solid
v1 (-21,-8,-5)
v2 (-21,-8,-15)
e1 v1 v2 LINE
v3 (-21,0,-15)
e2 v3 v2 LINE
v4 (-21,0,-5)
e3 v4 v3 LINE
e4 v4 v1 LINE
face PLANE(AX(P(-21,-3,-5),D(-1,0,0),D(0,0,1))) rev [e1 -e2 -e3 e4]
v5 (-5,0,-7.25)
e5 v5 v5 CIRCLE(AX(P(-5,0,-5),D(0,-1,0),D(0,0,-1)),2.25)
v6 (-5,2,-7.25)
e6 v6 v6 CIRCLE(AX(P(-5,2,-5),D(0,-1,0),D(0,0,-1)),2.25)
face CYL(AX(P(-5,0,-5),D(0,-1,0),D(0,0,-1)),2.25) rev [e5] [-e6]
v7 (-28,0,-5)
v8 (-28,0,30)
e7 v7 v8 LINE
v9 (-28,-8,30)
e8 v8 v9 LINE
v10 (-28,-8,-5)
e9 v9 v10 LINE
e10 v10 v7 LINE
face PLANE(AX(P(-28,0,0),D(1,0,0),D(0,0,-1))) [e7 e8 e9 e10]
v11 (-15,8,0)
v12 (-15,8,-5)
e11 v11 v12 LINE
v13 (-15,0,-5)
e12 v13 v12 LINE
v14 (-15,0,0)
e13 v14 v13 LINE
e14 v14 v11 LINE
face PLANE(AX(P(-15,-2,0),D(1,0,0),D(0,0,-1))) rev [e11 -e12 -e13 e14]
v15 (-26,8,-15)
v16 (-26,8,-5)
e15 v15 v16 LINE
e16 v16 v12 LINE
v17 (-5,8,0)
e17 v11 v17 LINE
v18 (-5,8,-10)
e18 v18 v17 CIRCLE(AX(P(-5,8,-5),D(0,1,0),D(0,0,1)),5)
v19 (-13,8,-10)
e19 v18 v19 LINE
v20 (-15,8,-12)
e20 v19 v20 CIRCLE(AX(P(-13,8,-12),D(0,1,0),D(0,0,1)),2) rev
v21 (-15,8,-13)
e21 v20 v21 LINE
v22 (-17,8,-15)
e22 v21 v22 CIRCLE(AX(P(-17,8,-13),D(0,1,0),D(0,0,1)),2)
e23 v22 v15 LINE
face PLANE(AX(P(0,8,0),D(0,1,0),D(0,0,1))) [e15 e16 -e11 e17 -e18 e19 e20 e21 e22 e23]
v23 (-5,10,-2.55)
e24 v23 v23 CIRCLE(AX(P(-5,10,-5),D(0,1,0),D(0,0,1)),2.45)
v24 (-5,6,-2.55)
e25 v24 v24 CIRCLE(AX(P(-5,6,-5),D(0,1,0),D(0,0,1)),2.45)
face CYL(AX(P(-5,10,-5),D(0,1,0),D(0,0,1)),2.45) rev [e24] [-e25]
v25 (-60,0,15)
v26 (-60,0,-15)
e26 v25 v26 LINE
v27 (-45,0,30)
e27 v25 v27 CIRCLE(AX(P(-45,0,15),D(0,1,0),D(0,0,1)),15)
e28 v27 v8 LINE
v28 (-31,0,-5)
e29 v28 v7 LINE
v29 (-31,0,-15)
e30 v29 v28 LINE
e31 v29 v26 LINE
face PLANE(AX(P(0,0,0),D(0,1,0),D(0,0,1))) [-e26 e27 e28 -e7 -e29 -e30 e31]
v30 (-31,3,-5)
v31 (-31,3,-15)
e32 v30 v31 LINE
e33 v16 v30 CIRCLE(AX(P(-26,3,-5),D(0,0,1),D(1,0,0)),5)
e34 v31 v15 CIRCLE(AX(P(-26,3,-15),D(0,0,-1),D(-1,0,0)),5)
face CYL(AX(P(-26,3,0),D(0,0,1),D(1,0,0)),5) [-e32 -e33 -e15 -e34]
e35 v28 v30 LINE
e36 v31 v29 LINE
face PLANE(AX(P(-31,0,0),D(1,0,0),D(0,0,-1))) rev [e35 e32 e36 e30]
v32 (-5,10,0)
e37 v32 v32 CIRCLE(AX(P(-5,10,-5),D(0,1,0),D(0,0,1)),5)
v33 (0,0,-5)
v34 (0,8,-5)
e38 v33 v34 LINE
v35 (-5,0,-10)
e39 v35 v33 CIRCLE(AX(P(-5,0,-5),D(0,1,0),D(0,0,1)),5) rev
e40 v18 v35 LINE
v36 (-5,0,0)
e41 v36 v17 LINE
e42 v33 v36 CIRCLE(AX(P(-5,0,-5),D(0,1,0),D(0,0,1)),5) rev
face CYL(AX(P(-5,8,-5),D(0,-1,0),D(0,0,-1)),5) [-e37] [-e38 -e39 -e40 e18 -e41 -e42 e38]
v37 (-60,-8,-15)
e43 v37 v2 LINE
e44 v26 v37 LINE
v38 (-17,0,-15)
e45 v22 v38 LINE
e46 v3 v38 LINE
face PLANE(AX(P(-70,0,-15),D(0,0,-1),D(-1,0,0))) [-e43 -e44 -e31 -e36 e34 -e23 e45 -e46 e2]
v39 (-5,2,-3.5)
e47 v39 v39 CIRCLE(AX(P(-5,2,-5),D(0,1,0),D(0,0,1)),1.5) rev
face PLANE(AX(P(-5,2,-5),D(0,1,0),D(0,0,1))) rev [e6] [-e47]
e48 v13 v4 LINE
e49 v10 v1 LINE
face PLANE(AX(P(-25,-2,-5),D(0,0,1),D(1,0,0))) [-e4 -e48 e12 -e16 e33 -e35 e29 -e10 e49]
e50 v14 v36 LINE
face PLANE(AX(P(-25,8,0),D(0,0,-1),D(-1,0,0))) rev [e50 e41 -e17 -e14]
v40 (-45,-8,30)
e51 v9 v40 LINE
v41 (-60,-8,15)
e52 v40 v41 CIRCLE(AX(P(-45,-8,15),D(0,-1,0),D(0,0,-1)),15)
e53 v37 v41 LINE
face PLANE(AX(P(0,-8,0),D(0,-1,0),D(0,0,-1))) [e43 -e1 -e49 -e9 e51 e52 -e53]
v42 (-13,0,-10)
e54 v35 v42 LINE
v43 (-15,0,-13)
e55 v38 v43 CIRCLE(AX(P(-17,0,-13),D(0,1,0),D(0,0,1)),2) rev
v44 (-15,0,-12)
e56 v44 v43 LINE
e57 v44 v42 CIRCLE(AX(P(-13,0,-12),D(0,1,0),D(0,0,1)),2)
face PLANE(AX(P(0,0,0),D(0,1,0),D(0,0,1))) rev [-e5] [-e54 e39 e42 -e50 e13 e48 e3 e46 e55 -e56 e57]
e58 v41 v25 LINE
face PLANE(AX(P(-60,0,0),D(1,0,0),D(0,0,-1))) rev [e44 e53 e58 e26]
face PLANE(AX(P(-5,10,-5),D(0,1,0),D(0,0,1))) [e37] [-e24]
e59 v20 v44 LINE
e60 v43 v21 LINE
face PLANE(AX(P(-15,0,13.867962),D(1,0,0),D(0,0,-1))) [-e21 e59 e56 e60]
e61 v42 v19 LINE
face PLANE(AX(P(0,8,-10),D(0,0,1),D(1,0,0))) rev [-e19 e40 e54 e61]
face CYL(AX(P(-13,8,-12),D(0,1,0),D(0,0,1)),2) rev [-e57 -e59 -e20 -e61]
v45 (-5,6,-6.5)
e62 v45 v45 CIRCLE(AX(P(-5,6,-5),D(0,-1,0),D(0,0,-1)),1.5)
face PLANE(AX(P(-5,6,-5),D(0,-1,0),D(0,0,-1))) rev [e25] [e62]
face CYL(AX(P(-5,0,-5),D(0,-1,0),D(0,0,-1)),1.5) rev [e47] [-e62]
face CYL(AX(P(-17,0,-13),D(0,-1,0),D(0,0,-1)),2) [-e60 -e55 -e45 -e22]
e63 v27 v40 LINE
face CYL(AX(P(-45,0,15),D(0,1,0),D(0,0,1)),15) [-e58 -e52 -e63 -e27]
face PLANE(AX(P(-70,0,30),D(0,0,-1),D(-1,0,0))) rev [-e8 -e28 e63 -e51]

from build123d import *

# Parameters (mm, degrees)
EXTRUDE_1_DEPTH      = 8
FILLET_1_R           = 5
SKETCH_5_W           = 10
SKETCH_5_H           = 5
CUT_EXTRUDE_1_DEPTH  = 10
SKETCH_6_W           = 55
SKETCH_6_H           = 5
EXTRUDE_2_DEPTH      = 8
SKETCH_7_R           = 5
EXTRUDE_3_DEPTH      = 2
HOLE_WIZARD_1_D      = 4.9
HOLE_WIZARD_1_DEPTH  = 4
HOLE_WIZARD_2_D      = 3
HOLE_WIZARD_3_D      = 4.5
HOLE_WIZARD_3_DEPTH  = 2
SKETCH_16_W          = 45
SKETCH_16_H          = 10
CUT_EXTRUDE_4_DEPTH  = 82.018516402
SKETCH_17_W          = 45
SKETCH_17_H          = 45
EXTRUDE_4_DEPTH      = 16
SKETCH_20_W          = 45
SKETCH_20_H          = 45
CUT_EXTRUDE_5_DEPTH  = 8
SKETCH_21_W          = 10
SKETCH_21_H          = 16
EXTRUDE_6_DEPTH      = 10
SKETCH_23_W          = 55
SKETCH_23_H          = 45
CUT_EXTRUDE_6_DEPTH  = 8
SKETCH_24_W          = 35
SKETCH_24_H          = 8
CUT_EXTRUDE_7_DEPTH  = 3
FILLET_5_R           = 2
SKETCH_25_W          = 45
SKETCH_25_H          = 8
CUT_EXTRUDE_8_DEPTH  = 10
FILLET_6_R           = 15
SKETCH_27_W          = 6
SKETCH_27_H          = 10
CUT_EXTRUDE_10_DEPTH = 5
SKETCH_28_W          = 6
SKETCH_28_H          = 3
CUT_EXTRUDE_11_DEPTH = 76.663729752
SKETCH_29_W          = 10
SKETCH_29_H          = 8
EXTRUDE_7_DEPTH      = 6
FILLET_7_R           = 5


with BuildPart() as part:
    # 草图1 → 凸台-拉伸1 (new body)
    with BuildSketch(Plane(origin=(0, 0, 0), x_dir=(1, 0, 0), z_dir=(0, 1, 0))):
        Polygon((0, 0), (0, 10), (-70, 10), (-70, -40), (-25, -40), (-25, 0), align=None)
    extrude(amount=EXTRUDE_1_DEPTH)

    # 圆角1
    fillet_1_edges = [part.edges().sort_by_distance(p)[0] for p in [
        (0, 4, 0),
        (0, 4, -10),
    ]]
    fillet(fillet_1_edges, radius=FILLET_1_R - 0.0001)  # a hair under: the kernel refuses the full size

    # 草图5 → 切除-拉伸1 (cut)
    with BuildSketch(Plane(origin=(0, 8, 0), x_dir=(1, 0, 0), z_dir=(0, 1, 0))):
        with Locations((-20, 2.5)):
            Rectangle(SKETCH_5_W, SKETCH_5_H)
    extrude(amount=-CUT_EXTRUDE_1_DEPTH, mode=Mode.SUBTRACT)

    # 草图6 → 凸台-拉伸2 (add)
    with BuildSketch(Plane(origin=(0, 8, 0), x_dir=(1, 0, 0), z_dir=(0, 1, 0))):
        with Locations((-42.5, 12.5)):
            Rectangle(SKETCH_6_W, SKETCH_6_H)
    extrude(amount=-EXTRUDE_2_DEPTH)

    # 草图7 → 凸台-拉伸3 (add)
    with BuildSketch(Plane(origin=(0, 8, 0), x_dir=(1, 0, 0), z_dir=(0, 1, 0))):
        with Locations(Location((-5, 5, 0), (0, 0, 270))):
            Circle(SKETCH_7_R)
    extrude(amount=EXTRUDE_3_DEPTH)

    # 孔1
    with Locations(Plane(origin=(0, 10, 0), x_dir=(1, 0, 0), z_dir=(0, 1, 0))):
        with Locations((-5, 5)):
            Hole(HOLE_WIZARD_1_D / 2, depth=HOLE_WIZARD_1_DEPTH)

    # 孔2 (through all)
    with Locations(Plane(origin=(0, 0, 0), x_dir=(-1, 0, 0), z_dir=(0, -1, 0))):
        with Locations((5, 5)):
            Hole(HOLE_WIZARD_2_D / 2)

    # 孔3
    with Locations(Plane(origin=(0, 0, 0), x_dir=(-1, 0, 0), z_dir=(0, -1, 0))):
        with Locations((5, 5)):
            Hole(HOLE_WIZARD_3_D / 2, depth=HOLE_WIZARD_3_DEPTH)

    # 草图16 → 切除-拉伸4 (cut, through all)
    with BuildSketch(Plane(origin=(0, 8, 0), x_dir=(1, 0, 0), z_dir=(0, 1, 0))):
        with Locations((-47.5, -35)):
            Rectangle(SKETCH_16_W, SKETCH_16_H)
    extrude(amount=-CUT_EXTRUDE_4_DEPTH, mode=Mode.SUBTRACT)

    # 草图17 → 凸台-拉伸4 (add)
    with BuildSketch(Plane.XZ):
        with Locations((-47.5, 7.5)):
            Rectangle(SKETCH_17_W, SKETCH_17_H)
    extrude(amount=EXTRUDE_4_DEPTH)

    # 草图20 → 切除-拉伸5 (cut)
    with BuildSketch(Plane(origin=(0, 8, 0), x_dir=(1, 0, 0), z_dir=(0, 1, 0))):
        with Locations((-47.5, -7.5)):
            Rectangle(SKETCH_20_W, SKETCH_20_H)
    extrude(amount=-CUT_EXTRUDE_5_DEPTH, mode=Mode.SUBTRACT)


with BuildPart() as cut_extrude_5_piece_1:
    # of the separate pieces the step leaves, piece 1, a body of its own (cut_extrude_5_pieces)
    add(part.part.solids().sort_by_distance((-25, 0, 30))[0])



with BuildPart() as cut_extrude_5_piece_2:
    # of the separate pieces the step leaves, piece 2, a body of its own (cut_extrude_5_pieces)
    add(part.part.solids().sort_by_distance((0, 0, -4.9999))[0])


with BuildPart() as cut_extrude_5_piece_1_1:
    add(cut_extrude_5_piece_1.part)

    add(cut_extrude_5_piece_2.part)  # 凸台-拉伸6 merges 切除-拉伸5 piece 2
    # 草图21 → 凸台-拉伸6 (add)
    with BuildSketch(Plane(origin=(0, 0, -15), x_dir=(-1, 0, 0), z_dir=(0, 0, -1))):
        with Locations((20, -8)):
            Rectangle(SKETCH_21_W, SKETCH_21_H)
    extrude(amount=-EXTRUDE_6_DEPTH)

    # 草图23 → 切除-拉伸6 (cut)
    with BuildSketch(Plane.XZ.offset(16)):
        with Locations((-42.5, 7.5)):
            Rectangle(SKETCH_23_W, SKETCH_23_H)
    extrude(amount=-CUT_EXTRUDE_6_DEPTH, mode=Mode.SUBTRACT)

    # 草图24 → 切除-拉伸7 (cut)
    with BuildSketch(Plane(origin=(-25, 0, 0), x_dir=(0, 0, -1), z_dir=(1, 0, 0))):
        with Locations((-12.5, -4)):
            Rectangle(SKETCH_24_W, SKETCH_24_H)
    extrude(amount=-CUT_EXTRUDE_7_DEPTH, mode=Mode.SUBTRACT)

    # 圆角5
    fillet_5_edges = [cut_extrude_5_piece_1_1.edges().sort_by_distance(p)[0] for p in [
        (-15, 0, -15),
        (-15, 4, -10),
    ]]
    fillet(fillet_5_edges, radius=FILLET_5_R)

    # 草图25 → 切除-拉伸8 (cut)
    with BuildSketch(Plane.ZY.offset(70)):
        with Locations((7.5, -4)):
            Rectangle(SKETCH_25_W, SKETCH_25_H)
    extrude(amount=-CUT_EXTRUDE_8_DEPTH, mode=Mode.SUBTRACT)

    # 圆角6
    fillet_6_edges = [cut_extrude_5_piece_1_1.edges().sort_by_distance(p)[0] for p in [
        (-60, -4, 30),
    ]]
    fillet(fillet_6_edges, radius=FILLET_6_R)

    # 草图27 → 切除-拉伸10 (cut)
    with BuildSketch(Plane(origin=(0, -8, 0), x_dir=(-1, 0, 0), z_dir=(0, -1, 0))):
        with Locations((18, 10)):
            Rectangle(SKETCH_27_W, SKETCH_27_H)
    extrude(amount=-CUT_EXTRUDE_10_DEPTH, mode=Mode.SUBTRACT)

    # 草图28 → 切除-拉伸11 (cut, through all)
    with BuildSketch(Plane(origin=(0, 0, -15), x_dir=(-1, 0, 0), z_dir=(0, 0, -1))):
        with Locations((18, -1.5)):
            Rectangle(SKETCH_28_W, SKETCH_28_H)
    extrude(amount=-CUT_EXTRUDE_11_DEPTH, mode=Mode.SUBTRACT)

    # 草图29 → 凸台-拉伸7 (add)
    with BuildSketch(Plane.ZY.offset(25)):
        with Locations((-10, 4)):
            Rectangle(SKETCH_29_W, SKETCH_29_H)
    extrude(amount=EXTRUDE_7_DEPTH)

    # 圆角7
    fillet_7_edges = [cut_extrude_5_piece_1_1.edges().sort_by_distance(p)[0] for p in [
        (-31, 8, -10),
    ]]
    fillet(fillet_7_edges, radius=FILLET_7_R)


solid = cut_extrude_5_piece_1_1.part
